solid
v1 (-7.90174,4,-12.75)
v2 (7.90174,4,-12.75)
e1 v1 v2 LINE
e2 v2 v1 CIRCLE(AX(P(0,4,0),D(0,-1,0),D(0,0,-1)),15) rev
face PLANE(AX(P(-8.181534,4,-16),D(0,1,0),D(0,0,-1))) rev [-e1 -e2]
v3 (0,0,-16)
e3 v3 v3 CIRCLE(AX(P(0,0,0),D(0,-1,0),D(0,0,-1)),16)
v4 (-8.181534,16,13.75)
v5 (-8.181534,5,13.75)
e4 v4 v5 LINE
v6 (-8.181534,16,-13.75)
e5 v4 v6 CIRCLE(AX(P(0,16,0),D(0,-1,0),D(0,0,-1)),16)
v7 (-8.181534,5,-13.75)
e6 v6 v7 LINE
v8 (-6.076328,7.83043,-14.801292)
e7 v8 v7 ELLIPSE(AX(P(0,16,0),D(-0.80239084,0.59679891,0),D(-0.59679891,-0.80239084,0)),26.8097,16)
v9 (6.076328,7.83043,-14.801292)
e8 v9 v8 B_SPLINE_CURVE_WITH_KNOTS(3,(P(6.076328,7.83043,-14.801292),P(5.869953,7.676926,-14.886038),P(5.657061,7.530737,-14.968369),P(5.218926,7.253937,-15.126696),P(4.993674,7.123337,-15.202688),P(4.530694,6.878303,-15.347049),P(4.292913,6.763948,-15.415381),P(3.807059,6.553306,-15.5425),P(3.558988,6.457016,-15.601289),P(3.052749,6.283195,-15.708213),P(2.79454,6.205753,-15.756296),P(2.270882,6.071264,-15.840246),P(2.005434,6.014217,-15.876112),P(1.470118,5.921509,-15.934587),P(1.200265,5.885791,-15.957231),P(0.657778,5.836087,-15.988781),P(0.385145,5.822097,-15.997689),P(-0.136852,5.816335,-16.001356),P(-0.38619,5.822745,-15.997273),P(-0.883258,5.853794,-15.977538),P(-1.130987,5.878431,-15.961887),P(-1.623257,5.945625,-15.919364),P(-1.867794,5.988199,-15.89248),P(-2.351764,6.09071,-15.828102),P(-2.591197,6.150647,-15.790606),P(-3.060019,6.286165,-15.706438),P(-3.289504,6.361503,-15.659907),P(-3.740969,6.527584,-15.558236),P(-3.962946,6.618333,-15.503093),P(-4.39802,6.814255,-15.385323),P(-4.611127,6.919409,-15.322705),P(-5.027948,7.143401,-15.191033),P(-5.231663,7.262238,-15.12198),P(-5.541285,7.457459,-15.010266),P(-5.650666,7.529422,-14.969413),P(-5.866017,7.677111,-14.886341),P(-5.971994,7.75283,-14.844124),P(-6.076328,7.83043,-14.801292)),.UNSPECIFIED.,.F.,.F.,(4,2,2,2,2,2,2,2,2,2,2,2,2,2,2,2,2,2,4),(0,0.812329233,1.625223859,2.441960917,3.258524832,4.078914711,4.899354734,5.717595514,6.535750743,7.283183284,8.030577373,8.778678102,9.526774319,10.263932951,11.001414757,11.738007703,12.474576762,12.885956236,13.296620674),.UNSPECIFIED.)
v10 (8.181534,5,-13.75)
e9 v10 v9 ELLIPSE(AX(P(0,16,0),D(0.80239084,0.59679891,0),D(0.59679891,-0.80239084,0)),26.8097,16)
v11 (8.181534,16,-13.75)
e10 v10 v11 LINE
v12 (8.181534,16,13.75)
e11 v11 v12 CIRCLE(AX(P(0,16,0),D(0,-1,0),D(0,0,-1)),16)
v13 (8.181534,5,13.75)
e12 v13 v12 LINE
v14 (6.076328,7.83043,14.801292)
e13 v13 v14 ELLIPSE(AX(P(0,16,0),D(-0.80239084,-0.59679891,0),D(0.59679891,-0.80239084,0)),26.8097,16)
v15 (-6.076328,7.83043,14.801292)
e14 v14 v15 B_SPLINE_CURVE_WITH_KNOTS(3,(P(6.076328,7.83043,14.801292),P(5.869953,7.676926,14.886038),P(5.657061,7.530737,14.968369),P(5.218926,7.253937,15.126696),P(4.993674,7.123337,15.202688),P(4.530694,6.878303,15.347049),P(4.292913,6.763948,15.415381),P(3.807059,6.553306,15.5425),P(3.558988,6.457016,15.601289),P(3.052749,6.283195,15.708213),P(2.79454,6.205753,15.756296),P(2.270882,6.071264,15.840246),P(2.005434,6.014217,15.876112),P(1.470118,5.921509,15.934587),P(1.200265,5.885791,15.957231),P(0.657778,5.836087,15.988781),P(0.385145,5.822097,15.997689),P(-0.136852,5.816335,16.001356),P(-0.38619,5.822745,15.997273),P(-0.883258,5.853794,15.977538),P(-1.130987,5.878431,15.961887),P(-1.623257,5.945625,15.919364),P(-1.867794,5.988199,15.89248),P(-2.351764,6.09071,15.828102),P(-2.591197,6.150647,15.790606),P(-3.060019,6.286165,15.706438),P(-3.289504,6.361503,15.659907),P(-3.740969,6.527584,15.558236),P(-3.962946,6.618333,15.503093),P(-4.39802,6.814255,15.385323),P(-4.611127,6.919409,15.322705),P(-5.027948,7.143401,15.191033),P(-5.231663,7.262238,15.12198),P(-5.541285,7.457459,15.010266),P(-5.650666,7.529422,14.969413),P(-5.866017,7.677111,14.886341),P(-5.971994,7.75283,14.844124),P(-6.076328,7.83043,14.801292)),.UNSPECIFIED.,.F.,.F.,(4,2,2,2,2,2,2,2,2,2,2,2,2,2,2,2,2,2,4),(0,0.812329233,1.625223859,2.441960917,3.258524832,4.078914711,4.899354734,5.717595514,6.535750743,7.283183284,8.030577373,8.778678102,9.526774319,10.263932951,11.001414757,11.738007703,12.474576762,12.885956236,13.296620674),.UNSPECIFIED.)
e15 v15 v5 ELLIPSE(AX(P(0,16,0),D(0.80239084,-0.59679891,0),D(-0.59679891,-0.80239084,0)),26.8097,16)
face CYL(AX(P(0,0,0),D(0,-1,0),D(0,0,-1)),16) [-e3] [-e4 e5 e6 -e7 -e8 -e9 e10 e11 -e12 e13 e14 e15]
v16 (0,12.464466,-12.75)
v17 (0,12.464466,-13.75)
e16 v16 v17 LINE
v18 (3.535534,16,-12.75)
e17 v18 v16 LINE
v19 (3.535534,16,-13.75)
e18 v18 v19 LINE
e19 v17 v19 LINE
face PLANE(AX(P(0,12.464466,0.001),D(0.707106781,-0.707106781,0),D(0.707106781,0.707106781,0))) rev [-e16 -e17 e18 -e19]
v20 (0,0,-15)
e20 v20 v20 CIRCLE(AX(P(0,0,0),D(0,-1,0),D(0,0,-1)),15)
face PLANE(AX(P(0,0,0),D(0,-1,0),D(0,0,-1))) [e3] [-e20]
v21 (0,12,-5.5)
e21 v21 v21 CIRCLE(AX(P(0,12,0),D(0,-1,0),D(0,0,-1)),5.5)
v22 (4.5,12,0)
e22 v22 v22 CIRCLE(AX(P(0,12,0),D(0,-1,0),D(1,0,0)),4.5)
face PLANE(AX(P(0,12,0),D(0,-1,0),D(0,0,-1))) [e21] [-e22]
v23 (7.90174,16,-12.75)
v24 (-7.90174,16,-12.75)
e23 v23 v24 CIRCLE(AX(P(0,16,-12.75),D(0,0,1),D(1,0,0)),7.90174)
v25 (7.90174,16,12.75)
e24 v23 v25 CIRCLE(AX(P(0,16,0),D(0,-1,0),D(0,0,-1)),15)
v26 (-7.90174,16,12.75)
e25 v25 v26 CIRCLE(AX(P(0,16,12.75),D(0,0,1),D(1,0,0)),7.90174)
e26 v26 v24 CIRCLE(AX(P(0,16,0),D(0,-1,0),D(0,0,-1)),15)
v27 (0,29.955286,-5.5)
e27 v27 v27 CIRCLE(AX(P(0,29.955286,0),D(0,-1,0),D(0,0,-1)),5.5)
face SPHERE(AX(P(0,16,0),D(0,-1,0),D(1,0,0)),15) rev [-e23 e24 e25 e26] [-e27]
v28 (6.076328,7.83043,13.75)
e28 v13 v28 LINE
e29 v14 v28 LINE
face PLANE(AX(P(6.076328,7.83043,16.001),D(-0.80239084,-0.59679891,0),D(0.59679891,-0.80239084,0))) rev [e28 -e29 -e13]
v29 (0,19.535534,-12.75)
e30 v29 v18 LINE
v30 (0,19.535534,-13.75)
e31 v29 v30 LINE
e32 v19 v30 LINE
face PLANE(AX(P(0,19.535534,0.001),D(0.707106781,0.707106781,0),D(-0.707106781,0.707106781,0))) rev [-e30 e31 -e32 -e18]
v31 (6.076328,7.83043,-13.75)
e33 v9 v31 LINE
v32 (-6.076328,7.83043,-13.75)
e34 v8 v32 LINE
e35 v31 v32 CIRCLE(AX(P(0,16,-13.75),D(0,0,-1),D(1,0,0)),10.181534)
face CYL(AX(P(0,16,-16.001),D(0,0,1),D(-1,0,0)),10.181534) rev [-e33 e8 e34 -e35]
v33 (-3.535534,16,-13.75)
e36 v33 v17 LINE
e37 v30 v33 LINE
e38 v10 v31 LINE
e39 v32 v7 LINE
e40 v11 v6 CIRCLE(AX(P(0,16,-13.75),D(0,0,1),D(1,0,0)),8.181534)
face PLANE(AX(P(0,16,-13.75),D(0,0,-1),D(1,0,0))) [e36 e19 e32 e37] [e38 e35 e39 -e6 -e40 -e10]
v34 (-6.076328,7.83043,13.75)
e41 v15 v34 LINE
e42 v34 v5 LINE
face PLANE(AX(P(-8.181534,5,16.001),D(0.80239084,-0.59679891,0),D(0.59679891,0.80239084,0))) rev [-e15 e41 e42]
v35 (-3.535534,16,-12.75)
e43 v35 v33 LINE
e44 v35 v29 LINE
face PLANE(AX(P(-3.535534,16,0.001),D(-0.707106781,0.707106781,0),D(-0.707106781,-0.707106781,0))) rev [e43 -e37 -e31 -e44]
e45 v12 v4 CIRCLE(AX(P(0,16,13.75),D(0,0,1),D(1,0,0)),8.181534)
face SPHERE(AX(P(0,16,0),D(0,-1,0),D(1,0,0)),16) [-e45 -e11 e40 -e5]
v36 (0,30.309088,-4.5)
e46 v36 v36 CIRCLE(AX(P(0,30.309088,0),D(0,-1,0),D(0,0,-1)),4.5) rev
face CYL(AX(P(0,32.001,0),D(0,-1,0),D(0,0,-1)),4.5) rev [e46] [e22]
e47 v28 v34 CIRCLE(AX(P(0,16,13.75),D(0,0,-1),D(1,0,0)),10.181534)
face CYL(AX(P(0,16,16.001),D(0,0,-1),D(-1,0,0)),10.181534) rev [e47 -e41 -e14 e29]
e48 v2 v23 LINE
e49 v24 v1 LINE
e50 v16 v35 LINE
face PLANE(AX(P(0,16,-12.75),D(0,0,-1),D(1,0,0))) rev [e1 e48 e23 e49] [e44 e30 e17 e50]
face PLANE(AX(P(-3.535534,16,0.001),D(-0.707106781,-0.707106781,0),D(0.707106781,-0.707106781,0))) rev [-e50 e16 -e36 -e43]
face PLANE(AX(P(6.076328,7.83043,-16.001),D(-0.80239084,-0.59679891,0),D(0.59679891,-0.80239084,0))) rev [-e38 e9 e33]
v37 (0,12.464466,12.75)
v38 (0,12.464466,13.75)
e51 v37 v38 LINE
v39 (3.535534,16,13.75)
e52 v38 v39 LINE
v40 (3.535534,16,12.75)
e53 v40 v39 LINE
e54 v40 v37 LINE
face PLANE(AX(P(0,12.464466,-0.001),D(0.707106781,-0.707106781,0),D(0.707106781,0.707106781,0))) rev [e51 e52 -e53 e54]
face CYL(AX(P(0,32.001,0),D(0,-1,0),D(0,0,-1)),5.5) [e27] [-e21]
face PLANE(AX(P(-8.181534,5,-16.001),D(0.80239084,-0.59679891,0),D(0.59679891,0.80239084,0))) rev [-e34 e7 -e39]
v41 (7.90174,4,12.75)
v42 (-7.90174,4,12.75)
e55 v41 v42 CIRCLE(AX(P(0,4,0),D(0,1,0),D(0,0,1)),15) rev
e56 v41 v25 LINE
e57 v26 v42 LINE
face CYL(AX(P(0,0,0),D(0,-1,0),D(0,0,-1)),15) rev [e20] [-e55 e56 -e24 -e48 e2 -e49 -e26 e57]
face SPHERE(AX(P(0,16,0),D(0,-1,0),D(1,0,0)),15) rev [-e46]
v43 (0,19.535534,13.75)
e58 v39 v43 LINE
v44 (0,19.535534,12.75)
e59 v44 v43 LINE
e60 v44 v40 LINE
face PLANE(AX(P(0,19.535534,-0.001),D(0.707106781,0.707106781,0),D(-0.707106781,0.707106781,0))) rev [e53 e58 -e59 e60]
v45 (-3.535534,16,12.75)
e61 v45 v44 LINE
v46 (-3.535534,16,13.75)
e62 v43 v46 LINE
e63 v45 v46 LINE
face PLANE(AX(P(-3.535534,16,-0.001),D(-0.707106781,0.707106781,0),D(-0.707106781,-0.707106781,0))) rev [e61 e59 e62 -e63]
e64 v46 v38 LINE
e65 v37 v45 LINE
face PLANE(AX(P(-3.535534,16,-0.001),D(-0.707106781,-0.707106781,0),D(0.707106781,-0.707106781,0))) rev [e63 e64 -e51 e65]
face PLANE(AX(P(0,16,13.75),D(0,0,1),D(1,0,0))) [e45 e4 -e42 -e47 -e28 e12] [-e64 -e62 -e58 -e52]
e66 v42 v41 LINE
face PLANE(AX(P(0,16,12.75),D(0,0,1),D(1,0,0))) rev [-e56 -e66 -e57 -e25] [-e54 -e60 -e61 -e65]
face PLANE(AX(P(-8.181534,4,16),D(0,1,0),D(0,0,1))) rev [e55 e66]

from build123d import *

# Parameters (mm, degrees)
REVOLVE1_ANGLE           = 180
CUT_EXTRUDE1_DEPTH       = 39.328351126
SHELL1_DEPTH             = 16
SHELL1_2_DEPTH           = 4
EXTRUDE1_REACH           = 40.328
EXTRUDE1_END_RADIUS      = 16
CUT_EXTRUDE2_REACH       = 40.328
EXTRUDE_THIN1_REACH      = 53.192
EXTRUDE_THIN1_END_RADIUS = 15
EXTRUDE_THIN1_START      = -12
SKETCH5_R                = 5.5
SKETCH5_R_2              = 4.5


with BuildPart() as part:
    # Sketch1 → Revolve1 (revolve)
    with BuildSketch(Plane(origin=(0, 0, 0), x_dir=(-1, 0, 0), z_dir=(0, 0, -1))):
        with BuildLine():
            Line((0, 0), (16, 0))
            Line((16, 0), (16, 16))
            ThreePointArc((16, 16), (11.313708499, 27.313708499), (0, 32))
            Line((0, 32), (0, 0))
        make_face()
    revolve(axis=Axis((0, 0, 0), (0, 1, 0)), revolution_arc=REVOLVE1_ANGLE)

    # Sketch2 → Cut-Extrude1 (cut, through all)
    with BuildSketch(Plane.XY.offset(13.75)):
        with BuildLine():
            Line((8.181534086, 5), (8.181534086, 16))
            ThreePointArc((8.181534086, 16), (0, 24.181534086), (-8.181534086, 16))
            Line((-8.181534086, 16), (-8.181534086, 5))
            Line((-8.181534086, 5), (8.181534086, 5))
        make_face()
    extrude(amount=CUT_EXTRUDE1_DEPTH, mode=Mode.SUBTRACT)

    # Shell1: read off the stored shape, not the designer's step
    # Shell1 outline → Shell1 (cut)
    with BuildSketch(Plane(origin=(0, 0, 0), x_dir=(1, 0, 0), z_dir=(0, 1, 0))):
        with BuildLine():
            ThreePointArc((7.901740315, -12.75), (13.105840391, -7.296365372), (15, 0))
            Line((15, 0), (-15, 0))
            ThreePointArc((-15, 0), (-13.105840391, -7.296365372), (-7.901740315, -12.75))
            Line((-7.901740315, -12.75), (7.901740315, -12.75))
        make_face()
    extrude(amount=SHELL1_DEPTH, mode=Mode.SUBTRACT)

    # Shell1 2 outline → Shell1 2 (cut)
    with BuildSketch(Plane(origin=(0, 0, 0), x_dir=(1, 0, 0), z_dir=(0, 1, 0))):
        with BuildLine():
            ThreePointArc((-7.901740315, -12.75), (0, -15), (7.901740315, -12.75))
            Line((7.901740315, -12.75), (-7.901740315, -12.75))
        make_face()
    extrude(amount=SHELL1_2_DEPTH, mode=Mode.SUBTRACT)

    # Shell1 3 outline → Shell1 3 (revolve, cut)
    with BuildSketch(Plane.XZ.offset(-16)):
        with BuildLine():
            ThreePointArc((15, 0), (13.105840391, 7.296365372), (7.901740315, 12.75))
            Line((7.901740315, 12.75), (0, 12.75))
            Line((0, 12.75), (0, 0))
            Line((0, 0), (15, 0))
        make_face()
    revolve(axis=Axis((0, 16, 0), (0, 0, 1)), mode=Mode.SUBTRACT)

    # Extrude1: up to this cylinder (the profile starts inside it)
    extrude1_end = Plane(origin=(0, 6.31611, 0), z_dir=(0, -1, 0)) * Cylinder(EXTRUDE1_END_RADIUS, 113.656, mode=Mode.PRIVATE)
    # Sketch3 → Extrude1 (add, up to the surface)
    with BuildSketch(Plane.XY.offset(13.75), mode=Mode.PRIVATE) as extrude1_sk1:
        with BuildLine():
            Line((6.076328446, 7.830430308), (8.181534086, 5))
            Line((8.181534086, 5), (-8.181534086, 5))
            Line((-8.181534086, 5), (-6.076328446, 7.830430308))
            ThreePointArc((-6.076328446, 7.830430308), (0, 5.818465914), (6.076328446, 7.830430308))
        make_face()
    extrude1_tool1 = extrude(extrude1_sk1.sketch, amount=EXTRUDE1_REACH, mode=Mode.PRIVATE) & extrude1_end
    add(extrude1_tool1.solids().sort_by_distance((6.995686, 6.31611, 13.75))[0])

    # Sketch4 → Cut-Extrude2 (cut, up to next)
    with BuildSketch(Plane.XY.offset(13.75), mode=Mode.PRIVATE) as cut_extrude2_sk1:
        Polygon((-3.535533906, 16), (0, 12.464466094), (3.535533906, 16), (0, 19.535533906), align=None)
    cut_extrude2_tool1 = extrude(cut_extrude2_sk1.sketch, amount=-CUT_EXTRUDE2_REACH, mode=Mode.PRIVATE) & part.part
    add(cut_extrude2_tool1.solids().sort_by_distance((0, 16, 13.75))[0], mode=Mode.SUBTRACT)

    # Mirror1: part across face


with BuildPart() as part_1:
    add(part.part)
    add(part.part.mirror(Plane(origin=(0, 18.784156894, 0), x_dir=(1, 0, 0), z_dir=(0, 0, -1))))

    # Extrude-Thin1: up to this sphere (the profile starts inside it)
    extrude_thin1_end = Location((0, 16, 0)) * Sphere(EXTRUDE_THIN1_END_RADIUS, mode=Mode.PRIVATE)
    # Sketch5 → Extrude-Thin1 (add, up to the surface)
    with BuildSketch(Plane.XZ.offset(EXTRUDE_THIN1_START), mode=Mode.PRIVATE) as extrude_thin1_sk1:
        Circle(SKETCH5_R)
        Circle(SKETCH5_R_2, mode=Mode.SUBTRACT)
    extrude_thin1_tool1 = extrude(extrude_thin1_sk1.sketch, amount=-EXTRUDE_THIN1_REACH, mode=Mode.PRIVATE) & extrude_thin1_end
    add(extrude_thin1_tool1.solids().sort_by_distance((-5.344437, 12, 0))[0])


solid = part_1.part
